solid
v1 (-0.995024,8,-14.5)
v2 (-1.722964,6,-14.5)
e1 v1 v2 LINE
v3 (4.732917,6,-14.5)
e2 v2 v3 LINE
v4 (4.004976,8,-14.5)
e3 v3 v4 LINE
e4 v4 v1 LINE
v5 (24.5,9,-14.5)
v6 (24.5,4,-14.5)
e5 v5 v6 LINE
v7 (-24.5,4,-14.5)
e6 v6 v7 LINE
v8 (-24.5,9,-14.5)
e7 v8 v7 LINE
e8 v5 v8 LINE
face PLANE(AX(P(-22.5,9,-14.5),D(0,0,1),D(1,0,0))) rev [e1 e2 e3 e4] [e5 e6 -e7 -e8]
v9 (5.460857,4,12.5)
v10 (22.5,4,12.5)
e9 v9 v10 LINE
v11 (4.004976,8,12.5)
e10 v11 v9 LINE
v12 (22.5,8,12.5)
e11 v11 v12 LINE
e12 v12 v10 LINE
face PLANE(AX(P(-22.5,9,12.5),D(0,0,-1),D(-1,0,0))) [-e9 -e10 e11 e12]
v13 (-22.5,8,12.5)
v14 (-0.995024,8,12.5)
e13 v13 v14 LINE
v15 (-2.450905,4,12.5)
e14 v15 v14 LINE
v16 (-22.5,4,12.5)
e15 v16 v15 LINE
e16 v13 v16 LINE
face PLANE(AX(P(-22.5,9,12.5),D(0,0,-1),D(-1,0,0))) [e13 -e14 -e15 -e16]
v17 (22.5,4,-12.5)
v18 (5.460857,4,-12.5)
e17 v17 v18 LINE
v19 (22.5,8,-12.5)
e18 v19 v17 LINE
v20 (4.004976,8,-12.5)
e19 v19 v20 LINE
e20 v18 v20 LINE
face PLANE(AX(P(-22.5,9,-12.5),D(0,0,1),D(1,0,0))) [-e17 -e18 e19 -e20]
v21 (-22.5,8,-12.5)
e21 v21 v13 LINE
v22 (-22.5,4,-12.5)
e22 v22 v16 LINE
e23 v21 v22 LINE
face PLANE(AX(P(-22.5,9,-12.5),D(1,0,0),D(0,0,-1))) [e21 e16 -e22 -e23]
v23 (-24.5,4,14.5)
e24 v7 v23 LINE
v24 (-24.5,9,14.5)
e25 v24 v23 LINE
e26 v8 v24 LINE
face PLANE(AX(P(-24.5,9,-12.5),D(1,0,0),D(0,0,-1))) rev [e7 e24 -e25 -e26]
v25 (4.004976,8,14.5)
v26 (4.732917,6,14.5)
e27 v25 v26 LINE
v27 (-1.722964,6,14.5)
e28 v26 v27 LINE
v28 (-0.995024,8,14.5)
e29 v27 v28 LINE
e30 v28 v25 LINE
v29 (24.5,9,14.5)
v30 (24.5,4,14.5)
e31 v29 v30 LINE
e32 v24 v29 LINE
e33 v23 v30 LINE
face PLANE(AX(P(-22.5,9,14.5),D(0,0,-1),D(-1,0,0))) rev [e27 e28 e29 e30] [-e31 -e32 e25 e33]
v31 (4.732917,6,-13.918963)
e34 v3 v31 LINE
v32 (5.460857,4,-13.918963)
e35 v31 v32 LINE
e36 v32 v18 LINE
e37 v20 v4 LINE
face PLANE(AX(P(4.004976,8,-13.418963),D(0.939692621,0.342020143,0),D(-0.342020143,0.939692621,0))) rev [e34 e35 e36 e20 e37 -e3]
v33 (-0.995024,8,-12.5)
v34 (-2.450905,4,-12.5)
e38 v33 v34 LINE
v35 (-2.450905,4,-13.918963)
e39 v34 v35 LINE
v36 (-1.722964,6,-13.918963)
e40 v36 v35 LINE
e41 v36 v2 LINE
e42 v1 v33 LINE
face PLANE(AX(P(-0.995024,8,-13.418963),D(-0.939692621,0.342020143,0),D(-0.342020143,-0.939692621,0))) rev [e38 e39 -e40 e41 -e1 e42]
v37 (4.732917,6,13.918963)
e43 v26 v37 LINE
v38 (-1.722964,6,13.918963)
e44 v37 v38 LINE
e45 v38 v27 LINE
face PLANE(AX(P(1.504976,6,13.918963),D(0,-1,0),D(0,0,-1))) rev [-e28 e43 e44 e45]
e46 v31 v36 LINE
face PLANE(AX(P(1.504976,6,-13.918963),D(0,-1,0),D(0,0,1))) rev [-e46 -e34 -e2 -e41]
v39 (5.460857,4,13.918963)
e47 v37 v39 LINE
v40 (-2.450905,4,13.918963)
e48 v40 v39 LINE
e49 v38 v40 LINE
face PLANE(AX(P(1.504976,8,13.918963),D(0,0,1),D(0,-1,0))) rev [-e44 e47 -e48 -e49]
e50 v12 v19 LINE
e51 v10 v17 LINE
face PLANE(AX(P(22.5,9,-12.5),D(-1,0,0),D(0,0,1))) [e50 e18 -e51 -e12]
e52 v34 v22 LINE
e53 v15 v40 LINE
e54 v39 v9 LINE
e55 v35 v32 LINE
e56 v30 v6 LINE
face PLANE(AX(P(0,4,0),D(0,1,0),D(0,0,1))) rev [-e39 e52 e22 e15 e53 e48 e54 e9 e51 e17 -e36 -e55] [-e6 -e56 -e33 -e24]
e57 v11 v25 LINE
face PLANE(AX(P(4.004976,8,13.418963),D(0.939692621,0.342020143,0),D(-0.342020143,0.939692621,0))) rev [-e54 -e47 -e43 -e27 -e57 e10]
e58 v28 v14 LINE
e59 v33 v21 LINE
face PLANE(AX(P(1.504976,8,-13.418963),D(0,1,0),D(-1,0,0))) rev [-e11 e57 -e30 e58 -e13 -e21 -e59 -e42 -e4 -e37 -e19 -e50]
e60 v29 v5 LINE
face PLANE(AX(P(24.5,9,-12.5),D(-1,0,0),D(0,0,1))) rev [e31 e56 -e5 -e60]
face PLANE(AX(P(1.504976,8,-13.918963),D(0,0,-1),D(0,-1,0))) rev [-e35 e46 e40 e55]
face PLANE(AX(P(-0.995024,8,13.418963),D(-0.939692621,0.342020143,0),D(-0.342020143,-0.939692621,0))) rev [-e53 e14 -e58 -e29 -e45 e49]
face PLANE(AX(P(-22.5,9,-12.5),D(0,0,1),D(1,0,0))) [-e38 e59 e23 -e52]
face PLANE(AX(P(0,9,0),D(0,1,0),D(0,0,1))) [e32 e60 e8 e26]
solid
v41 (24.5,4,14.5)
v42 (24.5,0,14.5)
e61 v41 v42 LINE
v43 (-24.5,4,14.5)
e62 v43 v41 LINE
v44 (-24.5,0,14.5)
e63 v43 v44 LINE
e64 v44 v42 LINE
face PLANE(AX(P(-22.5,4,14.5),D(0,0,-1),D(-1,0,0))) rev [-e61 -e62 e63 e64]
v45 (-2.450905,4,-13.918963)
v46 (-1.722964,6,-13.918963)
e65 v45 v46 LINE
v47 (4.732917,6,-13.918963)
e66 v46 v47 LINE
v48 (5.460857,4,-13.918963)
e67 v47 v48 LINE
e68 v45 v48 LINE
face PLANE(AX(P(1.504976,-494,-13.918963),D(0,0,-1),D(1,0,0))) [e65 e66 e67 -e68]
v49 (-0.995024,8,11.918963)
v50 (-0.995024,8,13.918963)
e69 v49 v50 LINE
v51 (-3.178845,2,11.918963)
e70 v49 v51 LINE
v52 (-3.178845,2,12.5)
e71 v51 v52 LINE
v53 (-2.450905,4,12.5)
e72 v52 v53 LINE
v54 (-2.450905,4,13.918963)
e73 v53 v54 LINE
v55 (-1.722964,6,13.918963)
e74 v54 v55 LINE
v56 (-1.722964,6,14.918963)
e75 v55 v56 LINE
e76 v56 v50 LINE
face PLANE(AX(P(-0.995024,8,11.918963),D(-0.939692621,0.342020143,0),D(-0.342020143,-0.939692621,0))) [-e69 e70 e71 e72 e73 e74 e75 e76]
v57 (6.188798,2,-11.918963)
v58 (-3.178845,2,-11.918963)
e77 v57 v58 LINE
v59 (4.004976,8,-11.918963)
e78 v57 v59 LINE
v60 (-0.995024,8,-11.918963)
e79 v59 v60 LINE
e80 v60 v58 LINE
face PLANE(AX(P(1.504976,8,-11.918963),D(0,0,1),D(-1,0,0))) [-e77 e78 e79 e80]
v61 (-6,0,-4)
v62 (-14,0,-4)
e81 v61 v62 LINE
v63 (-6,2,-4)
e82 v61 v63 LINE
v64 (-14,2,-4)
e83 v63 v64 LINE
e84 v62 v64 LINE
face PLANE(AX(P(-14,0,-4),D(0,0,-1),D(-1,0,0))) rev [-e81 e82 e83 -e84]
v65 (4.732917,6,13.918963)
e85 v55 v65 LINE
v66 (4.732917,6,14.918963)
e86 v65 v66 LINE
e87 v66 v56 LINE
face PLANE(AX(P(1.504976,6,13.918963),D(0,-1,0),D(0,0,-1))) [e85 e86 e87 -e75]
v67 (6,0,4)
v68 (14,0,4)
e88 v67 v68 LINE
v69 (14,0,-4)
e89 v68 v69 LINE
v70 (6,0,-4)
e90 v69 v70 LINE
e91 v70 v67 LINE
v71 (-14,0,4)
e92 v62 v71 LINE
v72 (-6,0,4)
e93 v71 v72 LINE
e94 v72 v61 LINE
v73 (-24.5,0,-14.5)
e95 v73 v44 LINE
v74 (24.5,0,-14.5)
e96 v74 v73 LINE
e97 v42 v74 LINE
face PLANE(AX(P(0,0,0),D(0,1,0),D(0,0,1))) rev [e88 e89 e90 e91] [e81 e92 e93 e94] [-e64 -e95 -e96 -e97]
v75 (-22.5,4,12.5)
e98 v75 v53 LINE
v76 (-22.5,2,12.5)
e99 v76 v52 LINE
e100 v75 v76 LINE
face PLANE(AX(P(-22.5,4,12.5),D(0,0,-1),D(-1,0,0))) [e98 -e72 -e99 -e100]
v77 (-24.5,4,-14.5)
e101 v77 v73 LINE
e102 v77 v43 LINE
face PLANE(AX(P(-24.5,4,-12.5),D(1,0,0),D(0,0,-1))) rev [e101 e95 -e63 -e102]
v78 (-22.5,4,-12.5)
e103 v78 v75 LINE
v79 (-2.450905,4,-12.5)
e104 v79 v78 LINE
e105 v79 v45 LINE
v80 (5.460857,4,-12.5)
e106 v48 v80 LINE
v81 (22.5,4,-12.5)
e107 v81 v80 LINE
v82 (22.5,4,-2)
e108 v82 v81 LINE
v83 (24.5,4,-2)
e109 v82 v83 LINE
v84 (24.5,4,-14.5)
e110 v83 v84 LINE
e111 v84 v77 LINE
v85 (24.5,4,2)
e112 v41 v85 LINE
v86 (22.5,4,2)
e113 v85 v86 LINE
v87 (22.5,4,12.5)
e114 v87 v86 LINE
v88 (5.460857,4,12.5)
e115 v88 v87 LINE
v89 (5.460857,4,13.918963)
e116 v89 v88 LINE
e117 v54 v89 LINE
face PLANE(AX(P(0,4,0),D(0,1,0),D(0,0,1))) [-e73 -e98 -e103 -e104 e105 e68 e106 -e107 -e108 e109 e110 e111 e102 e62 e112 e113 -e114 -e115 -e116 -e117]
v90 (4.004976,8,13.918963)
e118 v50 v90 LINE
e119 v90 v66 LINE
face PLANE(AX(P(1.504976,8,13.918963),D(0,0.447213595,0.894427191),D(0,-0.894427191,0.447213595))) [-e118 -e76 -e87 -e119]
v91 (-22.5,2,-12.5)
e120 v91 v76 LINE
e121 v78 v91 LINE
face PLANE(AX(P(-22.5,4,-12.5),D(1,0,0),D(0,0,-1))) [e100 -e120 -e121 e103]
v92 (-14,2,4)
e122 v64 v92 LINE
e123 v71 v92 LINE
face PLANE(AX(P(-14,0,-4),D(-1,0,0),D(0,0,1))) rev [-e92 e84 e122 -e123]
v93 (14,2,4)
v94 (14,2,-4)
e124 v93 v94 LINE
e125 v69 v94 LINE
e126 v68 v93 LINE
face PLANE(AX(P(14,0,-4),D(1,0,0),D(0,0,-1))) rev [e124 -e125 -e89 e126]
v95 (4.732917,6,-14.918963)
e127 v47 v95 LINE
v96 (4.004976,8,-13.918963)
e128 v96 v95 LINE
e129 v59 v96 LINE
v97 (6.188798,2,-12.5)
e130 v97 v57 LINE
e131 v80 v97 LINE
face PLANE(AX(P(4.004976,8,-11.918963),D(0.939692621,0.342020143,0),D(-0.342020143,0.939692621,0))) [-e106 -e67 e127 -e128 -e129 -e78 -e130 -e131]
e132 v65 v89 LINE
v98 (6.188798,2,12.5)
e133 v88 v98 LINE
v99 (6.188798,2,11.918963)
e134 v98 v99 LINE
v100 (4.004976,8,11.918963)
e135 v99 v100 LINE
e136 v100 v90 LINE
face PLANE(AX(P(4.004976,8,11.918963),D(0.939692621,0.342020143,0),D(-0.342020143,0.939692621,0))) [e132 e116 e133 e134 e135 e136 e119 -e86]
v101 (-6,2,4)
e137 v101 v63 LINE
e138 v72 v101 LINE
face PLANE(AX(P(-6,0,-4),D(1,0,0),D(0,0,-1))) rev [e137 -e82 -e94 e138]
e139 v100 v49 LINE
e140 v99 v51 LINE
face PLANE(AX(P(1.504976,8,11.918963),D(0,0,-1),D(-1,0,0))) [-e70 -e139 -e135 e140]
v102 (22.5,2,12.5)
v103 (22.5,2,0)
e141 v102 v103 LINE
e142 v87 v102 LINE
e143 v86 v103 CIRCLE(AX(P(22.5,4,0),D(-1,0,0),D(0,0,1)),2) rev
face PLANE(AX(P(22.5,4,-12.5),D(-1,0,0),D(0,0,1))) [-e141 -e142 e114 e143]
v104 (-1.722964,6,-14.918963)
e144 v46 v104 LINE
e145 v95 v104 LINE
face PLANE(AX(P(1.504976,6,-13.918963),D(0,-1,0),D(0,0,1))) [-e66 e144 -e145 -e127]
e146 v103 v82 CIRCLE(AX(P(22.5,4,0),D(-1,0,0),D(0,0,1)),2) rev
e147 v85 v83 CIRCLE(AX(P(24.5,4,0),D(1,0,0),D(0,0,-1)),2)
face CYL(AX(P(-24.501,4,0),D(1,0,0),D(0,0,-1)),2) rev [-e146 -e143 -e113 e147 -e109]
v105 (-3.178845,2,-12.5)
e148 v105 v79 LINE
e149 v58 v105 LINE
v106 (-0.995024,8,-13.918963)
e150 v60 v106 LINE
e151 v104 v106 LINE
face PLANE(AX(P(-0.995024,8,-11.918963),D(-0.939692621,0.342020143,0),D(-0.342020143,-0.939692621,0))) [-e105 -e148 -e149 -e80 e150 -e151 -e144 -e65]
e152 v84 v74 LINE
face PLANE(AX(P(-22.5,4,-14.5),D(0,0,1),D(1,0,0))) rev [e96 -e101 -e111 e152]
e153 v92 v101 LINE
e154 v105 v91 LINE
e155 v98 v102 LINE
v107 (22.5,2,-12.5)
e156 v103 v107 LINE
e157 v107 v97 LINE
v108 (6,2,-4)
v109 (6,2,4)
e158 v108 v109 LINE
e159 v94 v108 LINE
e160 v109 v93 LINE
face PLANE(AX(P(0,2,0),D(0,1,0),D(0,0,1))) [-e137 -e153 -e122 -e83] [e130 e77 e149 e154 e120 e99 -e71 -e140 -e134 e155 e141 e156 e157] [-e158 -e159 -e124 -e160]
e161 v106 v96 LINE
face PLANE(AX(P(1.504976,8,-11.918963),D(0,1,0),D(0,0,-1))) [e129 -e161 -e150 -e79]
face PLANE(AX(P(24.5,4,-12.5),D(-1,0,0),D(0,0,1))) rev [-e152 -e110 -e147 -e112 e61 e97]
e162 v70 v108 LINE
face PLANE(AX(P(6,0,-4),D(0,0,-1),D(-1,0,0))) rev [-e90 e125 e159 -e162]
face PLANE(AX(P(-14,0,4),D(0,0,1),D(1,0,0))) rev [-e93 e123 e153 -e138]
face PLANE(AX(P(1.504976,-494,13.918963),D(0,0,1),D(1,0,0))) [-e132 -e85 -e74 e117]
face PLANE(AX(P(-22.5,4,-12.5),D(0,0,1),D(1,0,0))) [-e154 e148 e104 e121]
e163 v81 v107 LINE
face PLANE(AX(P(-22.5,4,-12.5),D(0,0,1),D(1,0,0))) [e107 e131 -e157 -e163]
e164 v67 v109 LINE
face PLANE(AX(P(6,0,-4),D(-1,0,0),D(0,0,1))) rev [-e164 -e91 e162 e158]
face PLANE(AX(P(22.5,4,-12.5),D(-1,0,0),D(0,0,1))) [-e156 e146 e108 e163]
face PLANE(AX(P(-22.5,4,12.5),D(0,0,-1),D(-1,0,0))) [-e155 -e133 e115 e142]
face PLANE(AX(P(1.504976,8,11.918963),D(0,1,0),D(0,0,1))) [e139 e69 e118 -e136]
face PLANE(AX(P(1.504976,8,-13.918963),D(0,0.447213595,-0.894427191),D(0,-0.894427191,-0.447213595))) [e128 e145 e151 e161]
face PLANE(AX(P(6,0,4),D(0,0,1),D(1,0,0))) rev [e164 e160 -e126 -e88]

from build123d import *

# Parameters (mm, degrees)
SKETCH1_W            = 49
SKETCH1_H            = 29
SKETCH1_W_2          = 45
SKETCH1_H_2          = 25
EXTRUDE_THIN1_DEPTH  = 4
SKETCH1_2_W          = 45
SKETCH1_2_H          = 25
BOSS_EXTRUDE1_DEPTH  = 2
SKETCH2_W            = 8
SKETCH2_H            = 8
CUT_EXTRUDE1_DEPTH   = 29.539446386
CUT_EXTRUDE2_REACH   = 53.257
SKETCH3_R            = 2
SNAP_START           = -13.918963426
SNAP_HOOK1_DEPTH     = 2
SNAP_START_2         = -1.722964232
SNAP_HOOK1_2_DEPTH   = 6.455880937
SNAP_START_3         = -16
SNAP_HOOK1_3_DEPTH   = 2.081036574
SNAP_START_4         = -12.5
SNAP_HOOK1_4_DEPTH   = 0.581036574
SKETCH4_W            = 49
SKETCH4_H            = 29
SKETCH4_W_2          = 45
SKETCH4_H_2          = 25
EXTRUDE_THIN2_DEPTH  = 5
SNAP_GROOVE1_DEPTH   = 1.418963426
SNAP_START_5         = -14.5
SNAP_GROOVE1_2_DEPTH = 0.581036574
SKETCH5_W            = 49
SKETCH5_H            = 29
BOSS_EXTRUDE2_DEPTH  = 1


with BuildPart() as part:
    # Sketch1 → Extrude-Thin1 (new body)
    with BuildSketch(Plane(origin=(0, 0, 0), x_dir=(1, 0, 0), z_dir=(0, 1, 0))):
        Rectangle(SKETCH1_W, SKETCH1_H)
        Rectangle(SKETCH1_W_2, SKETCH1_H_2, mode=Mode.SUBTRACT)
    extrude(amount=EXTRUDE_THIN1_DEPTH)

    # Sketch1<2> → Boss-Extrude1 (add)
    with BuildSketch(Plane(origin=(0, 0, 0), x_dir=(1, 0, 0), z_dir=(0, 1, 0))):
        Rectangle(SKETCH1_2_W, SKETCH1_2_H)
    extrude(amount=BOSS_EXTRUDE1_DEPTH)

    # Sketch2 → Cut-Extrude1 (cut, through all)
    with BuildSketch(Plane(origin=(0, 2, 0), x_dir=(1, 0, 0), z_dir=(0, 1, 0))):
        with Locations((-10, 0)):
            Rectangle(SKETCH2_W, SKETCH2_H)
        with Locations((10, 0)):
            Rectangle(SKETCH2_W, SKETCH2_H)
    extrude(amount=-CUT_EXTRUDE1_DEPTH, mode=Mode.SUBTRACT)

    # Sketch3 → Cut-Extrude2 (cut, up to next)
    with BuildSketch(Plane(origin=(24.5, 0, 0), x_dir=(0, 0, -1), z_dir=(1, 0, 0)), mode=Mode.PRIVATE) as cut_extrude2_sk1:
        with Locations((0, 4)):
            Circle(SKETCH3_R)
    cut_extrude2_tool1 = extrude(cut_extrude2_sk1.sketch, amount=-CUT_EXTRUDE2_REACH, mode=Mode.PRIVATE) & part.part
    add(cut_extrude2_tool1.solids().sort_by_distance((24.5, 4, 0))[0], mode=Mode.SUBTRACT)

    # Snap Hook1: read off the stored shape, not the designer's step
    # Snap Hook1 outline → Snap Hook1 (add)
    with BuildSketch(Plane.XY.offset(SNAP_START)):
        Polygon((4.004976236, 8), (-0.995023764, 8), (-2.450904701, 4), (5.460857173, 4), align=None)
    snap_hook1 = extrude(amount=SNAP_HOOK1_DEPTH)

    # Snap Hook1 2 outline → Snap Hook1 2 (add)
    with BuildSketch(Plane.YZ.offset(SNAP_START_2)):
        Polygon((6, -13.918963426), (6, -14.918963426), (8, -13.918963426), align=None)
    snap_hook1_2 = extrude(amount=SNAP_HOOK1_2_DEPTH)

    # Snap Hook1 3 outline → Snap Hook1 3 (cut)
    with BuildSketch(Plane.XY.offset(SNAP_START_3)):
        Polygon((4.004976236, 8), (4.732916705, 6), (4.732916705, 9), (3.641006002, 9), align=None)
        Polygon((-1.722964232, 9), (-1.722964232, 6), (-0.995023764, 8), (-0.63105353, 9), align=None)
    snap_hook1_3 = extrude(amount=SNAP_HOOK1_3_DEPTH, mode=Mode.SUBTRACT)

    # Snap Hook1 4 outline → Snap Hook1 4 (add)
    with BuildSketch(Plane.XY.offset(SNAP_START_4)):
        Polygon((6.552767876, 1), (6.188797642, 2), (5.460857173, 4), (-2.450904701, 4), (-3.178845169, 2), (-3.542815403, 1), align=None)
    snap_hook1_4 = extrude(amount=SNAP_HOOK1_4_DEPTH)

    # Mirror3: Snap Hook1, Snap Hook1 2 across plane
    add(snap_hook1.mirror(Plane.XY))
    add(snap_hook1_2.mirror(Plane.XY))

    # Mirror3 2: Snap Hook1 3 across plane
    add(snap_hook1_3.mirror(Plane.XY), mode=Mode.SUBTRACT)

    # Mirror3 3: Snap Hook1 4 across plane
    add(snap_hook1_4.mirror(Plane.XY))


with BuildPart() as body_2:
    # Sketch4 → Extrude-Thin2 (new body)
    with BuildSketch(Plane(origin=(0, 4, 0), x_dir=(1, 0, 0), z_dir=(0, 1, 0))):
        Rectangle(SKETCH4_W, SKETCH4_H)
        Rectangle(SKETCH4_W_2, SKETCH4_H_2, mode=Mode.SUBTRACT)
    extrude(amount=EXTRUDE_THIN2_DEPTH)

    # Snap Groove1: read off the stored shape, not the designer's step
    # Snap Groove1 outline → Snap Groove1 (cut)
    with BuildSketch(Plane.XY.offset(SNAP_START)):
        Polygon((-0.995023764, 8), (-2.450904701, 4), (5.460857173, 4), (4.004976236, 8), align=None)
    snap_groove1 = extrude(amount=SNAP_GROOVE1_DEPTH, mode=Mode.SUBTRACT)

    # Snap Groove1 2 outline → Snap Groove1 2 (cut)
    with BuildSketch(Plane.XY.offset(SNAP_START_5)):
        Polygon((-0.995023764, 8), (-1.722964232, 6), (4.732916705, 6), (4.004976236, 8), align=None)
    snap_groove1_2 = extrude(amount=SNAP_GROOVE1_2_DEPTH, mode=Mode.SUBTRACT)

    # Mirror4: Snap Groove1, Snap Groove1 2 across plane
    add(snap_groove1.mirror(Plane.XY), mode=Mode.SUBTRACT)
    add(snap_groove1_2.mirror(Plane.XY), mode=Mode.SUBTRACT)

    # Sketch5 → Boss-Extrude2 (add)
    with BuildSketch(Plane(origin=(0, 9, 0), x_dir=(1, 0, 0), z_dir=(0, 1, 0))):
        Rectangle(SKETCH5_W, SKETCH5_H)
    extrude(amount=-BOSS_EXTRUDE2_DEPTH)


solid = Compound([part.part, body_2.part])
